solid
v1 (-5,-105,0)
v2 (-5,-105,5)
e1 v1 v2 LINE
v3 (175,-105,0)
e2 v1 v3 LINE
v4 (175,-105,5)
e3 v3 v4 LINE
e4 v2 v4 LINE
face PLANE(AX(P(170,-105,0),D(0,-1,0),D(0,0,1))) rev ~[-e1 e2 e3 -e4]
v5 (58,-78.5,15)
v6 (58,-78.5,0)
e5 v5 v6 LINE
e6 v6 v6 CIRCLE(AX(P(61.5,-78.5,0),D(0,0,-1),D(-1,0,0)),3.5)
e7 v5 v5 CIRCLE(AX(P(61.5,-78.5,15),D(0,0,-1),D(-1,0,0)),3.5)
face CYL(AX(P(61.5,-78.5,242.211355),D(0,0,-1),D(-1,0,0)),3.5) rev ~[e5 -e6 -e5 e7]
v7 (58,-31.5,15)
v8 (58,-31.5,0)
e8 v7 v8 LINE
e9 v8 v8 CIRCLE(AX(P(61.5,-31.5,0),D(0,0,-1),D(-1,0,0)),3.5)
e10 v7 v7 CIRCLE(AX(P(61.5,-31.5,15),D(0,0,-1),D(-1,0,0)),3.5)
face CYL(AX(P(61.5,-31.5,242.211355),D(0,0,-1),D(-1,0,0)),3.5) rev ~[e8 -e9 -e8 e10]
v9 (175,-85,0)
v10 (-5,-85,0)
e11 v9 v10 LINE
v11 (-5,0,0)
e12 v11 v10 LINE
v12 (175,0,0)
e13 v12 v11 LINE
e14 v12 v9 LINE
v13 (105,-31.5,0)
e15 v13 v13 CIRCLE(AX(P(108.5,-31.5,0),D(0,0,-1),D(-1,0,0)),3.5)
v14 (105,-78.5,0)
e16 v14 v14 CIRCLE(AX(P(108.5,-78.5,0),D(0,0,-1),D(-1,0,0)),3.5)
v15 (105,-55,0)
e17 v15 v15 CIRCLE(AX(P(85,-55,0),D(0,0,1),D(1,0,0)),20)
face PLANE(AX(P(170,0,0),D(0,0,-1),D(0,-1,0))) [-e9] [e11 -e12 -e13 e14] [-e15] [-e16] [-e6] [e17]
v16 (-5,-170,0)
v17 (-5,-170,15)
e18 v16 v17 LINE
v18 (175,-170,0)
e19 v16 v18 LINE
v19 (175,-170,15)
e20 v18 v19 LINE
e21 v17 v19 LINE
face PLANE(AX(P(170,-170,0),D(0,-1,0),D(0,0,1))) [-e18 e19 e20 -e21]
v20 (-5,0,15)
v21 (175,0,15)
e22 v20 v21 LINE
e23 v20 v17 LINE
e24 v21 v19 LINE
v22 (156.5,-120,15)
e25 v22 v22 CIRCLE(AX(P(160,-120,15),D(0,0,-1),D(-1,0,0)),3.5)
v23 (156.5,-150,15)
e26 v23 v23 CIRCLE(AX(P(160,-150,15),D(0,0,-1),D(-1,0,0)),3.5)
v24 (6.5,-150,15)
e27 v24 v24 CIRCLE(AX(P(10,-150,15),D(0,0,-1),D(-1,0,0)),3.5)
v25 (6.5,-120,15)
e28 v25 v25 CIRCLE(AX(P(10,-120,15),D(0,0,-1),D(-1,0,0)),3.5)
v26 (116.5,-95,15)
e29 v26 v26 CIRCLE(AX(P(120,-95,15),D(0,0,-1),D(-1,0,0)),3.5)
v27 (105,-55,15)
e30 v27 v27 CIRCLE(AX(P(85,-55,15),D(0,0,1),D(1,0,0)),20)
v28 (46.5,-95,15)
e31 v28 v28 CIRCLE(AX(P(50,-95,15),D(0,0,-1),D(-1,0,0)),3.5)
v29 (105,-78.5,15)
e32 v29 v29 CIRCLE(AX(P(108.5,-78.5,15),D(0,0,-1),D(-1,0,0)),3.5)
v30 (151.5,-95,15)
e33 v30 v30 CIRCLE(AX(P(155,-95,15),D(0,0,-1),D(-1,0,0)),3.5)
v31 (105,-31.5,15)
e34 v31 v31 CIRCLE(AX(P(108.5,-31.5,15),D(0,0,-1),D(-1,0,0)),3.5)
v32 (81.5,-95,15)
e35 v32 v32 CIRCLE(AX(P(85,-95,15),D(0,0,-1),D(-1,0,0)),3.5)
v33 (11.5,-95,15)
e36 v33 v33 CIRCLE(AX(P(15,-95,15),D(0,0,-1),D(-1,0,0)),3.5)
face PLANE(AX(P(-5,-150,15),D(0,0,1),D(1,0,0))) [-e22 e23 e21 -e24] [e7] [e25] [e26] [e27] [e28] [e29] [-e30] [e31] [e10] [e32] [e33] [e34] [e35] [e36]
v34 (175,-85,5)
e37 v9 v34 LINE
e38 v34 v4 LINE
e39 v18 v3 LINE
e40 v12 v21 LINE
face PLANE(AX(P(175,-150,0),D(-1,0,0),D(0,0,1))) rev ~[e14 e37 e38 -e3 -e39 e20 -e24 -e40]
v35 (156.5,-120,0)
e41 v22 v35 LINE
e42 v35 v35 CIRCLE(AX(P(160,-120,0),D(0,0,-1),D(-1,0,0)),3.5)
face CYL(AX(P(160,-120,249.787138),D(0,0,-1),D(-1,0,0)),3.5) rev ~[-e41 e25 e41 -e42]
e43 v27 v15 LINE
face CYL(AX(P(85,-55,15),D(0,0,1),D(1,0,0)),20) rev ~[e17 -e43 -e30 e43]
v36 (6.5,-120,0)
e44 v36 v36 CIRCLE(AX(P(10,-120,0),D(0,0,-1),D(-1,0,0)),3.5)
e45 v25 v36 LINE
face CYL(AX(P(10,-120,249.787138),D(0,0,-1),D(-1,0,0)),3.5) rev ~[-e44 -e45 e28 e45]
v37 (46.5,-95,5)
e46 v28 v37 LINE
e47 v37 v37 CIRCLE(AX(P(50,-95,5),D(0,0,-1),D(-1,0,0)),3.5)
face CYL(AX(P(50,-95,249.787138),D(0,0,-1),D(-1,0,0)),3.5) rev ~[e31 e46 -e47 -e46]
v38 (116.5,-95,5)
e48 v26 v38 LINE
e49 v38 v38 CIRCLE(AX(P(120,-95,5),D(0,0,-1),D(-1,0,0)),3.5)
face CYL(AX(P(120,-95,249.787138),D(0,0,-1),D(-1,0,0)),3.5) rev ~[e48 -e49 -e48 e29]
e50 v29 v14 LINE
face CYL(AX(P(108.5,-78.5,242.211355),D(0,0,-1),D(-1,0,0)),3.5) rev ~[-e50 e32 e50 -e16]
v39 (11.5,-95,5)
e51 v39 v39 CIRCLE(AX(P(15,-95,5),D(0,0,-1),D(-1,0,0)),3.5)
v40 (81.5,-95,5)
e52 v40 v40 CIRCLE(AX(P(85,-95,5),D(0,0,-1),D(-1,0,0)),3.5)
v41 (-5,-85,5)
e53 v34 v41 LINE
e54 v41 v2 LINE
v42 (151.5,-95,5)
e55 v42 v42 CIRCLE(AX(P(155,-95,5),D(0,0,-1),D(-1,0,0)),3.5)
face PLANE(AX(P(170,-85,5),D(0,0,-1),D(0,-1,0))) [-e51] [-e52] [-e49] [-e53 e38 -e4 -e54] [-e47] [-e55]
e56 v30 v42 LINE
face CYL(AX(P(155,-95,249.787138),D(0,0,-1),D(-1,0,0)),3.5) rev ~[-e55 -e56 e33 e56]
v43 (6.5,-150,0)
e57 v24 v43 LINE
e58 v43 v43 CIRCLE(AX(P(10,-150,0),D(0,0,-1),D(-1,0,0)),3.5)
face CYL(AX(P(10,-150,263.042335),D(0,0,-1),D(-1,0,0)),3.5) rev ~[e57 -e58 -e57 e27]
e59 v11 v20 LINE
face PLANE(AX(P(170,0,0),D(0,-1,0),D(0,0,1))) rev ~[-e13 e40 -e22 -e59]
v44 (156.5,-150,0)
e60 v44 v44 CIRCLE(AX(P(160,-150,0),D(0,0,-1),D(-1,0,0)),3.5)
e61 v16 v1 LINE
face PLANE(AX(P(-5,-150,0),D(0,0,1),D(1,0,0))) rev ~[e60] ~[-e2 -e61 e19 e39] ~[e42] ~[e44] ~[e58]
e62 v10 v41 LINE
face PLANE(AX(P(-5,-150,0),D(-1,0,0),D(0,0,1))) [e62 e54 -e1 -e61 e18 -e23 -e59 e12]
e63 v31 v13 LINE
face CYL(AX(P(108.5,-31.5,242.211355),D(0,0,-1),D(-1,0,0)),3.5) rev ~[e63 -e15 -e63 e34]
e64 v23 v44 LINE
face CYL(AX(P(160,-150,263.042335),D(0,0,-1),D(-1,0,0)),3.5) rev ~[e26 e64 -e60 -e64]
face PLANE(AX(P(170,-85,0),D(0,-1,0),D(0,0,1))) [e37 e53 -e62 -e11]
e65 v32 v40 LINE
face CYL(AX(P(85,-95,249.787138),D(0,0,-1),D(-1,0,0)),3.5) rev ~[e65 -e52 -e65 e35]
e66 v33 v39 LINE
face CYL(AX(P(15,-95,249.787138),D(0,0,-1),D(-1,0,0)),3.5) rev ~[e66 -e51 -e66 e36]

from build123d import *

# Parameters (mm, degrees)
F0_W      = 170
F0_H      = 15
F1_DEPTH  = 150
F2_W      = 170
F2_H      = 20
F3_DEPTH  = 5
F4_R      = 20
F5_DEPTH  = 25
F7_D      = 7
F8_DEPTH  = 5
F9_DEPTH  = 5
F11_D     = 7
F13_D     = 7
F14_DEPTH = 20
F16_D     = 7


# Not quite as in the source:
# - a feature names something its author has since deleted; it is built from what else it names


with BuildPart() as f1:
    # F0 (on Front) → F1 (new body)
    with BuildSketch(Plane.XZ):
        with Locations((85, 7.5)):
            Rectangle(F0_W, F0_H)
    extrude(amount=F1_DEPTH)

    # F2 (on face) → F3 (cut)
    with BuildSketch(Plane(origin=(0, 0, 0), x_dir=(1, 0, 0), z_dir=(0, 0, -1))):
        with Locations((85, 95)):
            Rectangle(F2_W, F2_H)
    extrude(amount=-F3_DEPTH, mode=Mode.SUBTRACT)

    # F4 (on face) → F5 (cut)
    with BuildSketch(Plane.XY.offset(15)):
        with Locations((85, -55)):
            Circle(F4_R)
    extrude(amount=-F5_DEPTH, mode=Mode.SUBTRACT)

    # F7 (through all)
    with Locations(Plane.XY.offset(15)):
        with Locations((61.5, -31.5), (61.5, -78.5), (108.5, -78.5), (108.5, -31.5)):
            Hole(F7_D / 2)

    # F8 (add): a face of the model
    f8_faces = [f1.faces().sort_by_distance(p)[0] for p in [
        (0, -74.0697674419, 7.7325581395),
    ]]
    extrude(f8_faces, amount=F8_DEPTH)

    # F9 (add): a face of the model
    f9_faces = [f1.faces().sort_by_distance(p)[0] for p in [
        (170, -74.0697674419, 7.7325581395),
    ]]
    extrude(f9_faces, amount=F9_DEPTH)

    # F11 (through all)
    with Locations(Plane.XY.offset(15)):
        with Locations((50, -95), (15, -95), (85, -95), (120, -95), (155, -95)):
            Hole(F11_D / 2)

    # F13 (through all)
    with Locations(Plane.XY.offset(15)):
        with Locations((10, -120), (160, -120)):
            Hole(F13_D / 2)

    # F14 (add): a face of the model
    f14_faces = [f1.faces().sort_by_distance(p)[0] for p in [
        (85, -150, 7.5),
    ]]
    extrude(f14_faces, amount=F14_DEPTH)

    # F16 (through all)
    with Locations(Plane.XY.offset(15)):
        with Locations((10, -150), (160, -150)):
            Hole(F16_D / 2)


solid = f1.part
